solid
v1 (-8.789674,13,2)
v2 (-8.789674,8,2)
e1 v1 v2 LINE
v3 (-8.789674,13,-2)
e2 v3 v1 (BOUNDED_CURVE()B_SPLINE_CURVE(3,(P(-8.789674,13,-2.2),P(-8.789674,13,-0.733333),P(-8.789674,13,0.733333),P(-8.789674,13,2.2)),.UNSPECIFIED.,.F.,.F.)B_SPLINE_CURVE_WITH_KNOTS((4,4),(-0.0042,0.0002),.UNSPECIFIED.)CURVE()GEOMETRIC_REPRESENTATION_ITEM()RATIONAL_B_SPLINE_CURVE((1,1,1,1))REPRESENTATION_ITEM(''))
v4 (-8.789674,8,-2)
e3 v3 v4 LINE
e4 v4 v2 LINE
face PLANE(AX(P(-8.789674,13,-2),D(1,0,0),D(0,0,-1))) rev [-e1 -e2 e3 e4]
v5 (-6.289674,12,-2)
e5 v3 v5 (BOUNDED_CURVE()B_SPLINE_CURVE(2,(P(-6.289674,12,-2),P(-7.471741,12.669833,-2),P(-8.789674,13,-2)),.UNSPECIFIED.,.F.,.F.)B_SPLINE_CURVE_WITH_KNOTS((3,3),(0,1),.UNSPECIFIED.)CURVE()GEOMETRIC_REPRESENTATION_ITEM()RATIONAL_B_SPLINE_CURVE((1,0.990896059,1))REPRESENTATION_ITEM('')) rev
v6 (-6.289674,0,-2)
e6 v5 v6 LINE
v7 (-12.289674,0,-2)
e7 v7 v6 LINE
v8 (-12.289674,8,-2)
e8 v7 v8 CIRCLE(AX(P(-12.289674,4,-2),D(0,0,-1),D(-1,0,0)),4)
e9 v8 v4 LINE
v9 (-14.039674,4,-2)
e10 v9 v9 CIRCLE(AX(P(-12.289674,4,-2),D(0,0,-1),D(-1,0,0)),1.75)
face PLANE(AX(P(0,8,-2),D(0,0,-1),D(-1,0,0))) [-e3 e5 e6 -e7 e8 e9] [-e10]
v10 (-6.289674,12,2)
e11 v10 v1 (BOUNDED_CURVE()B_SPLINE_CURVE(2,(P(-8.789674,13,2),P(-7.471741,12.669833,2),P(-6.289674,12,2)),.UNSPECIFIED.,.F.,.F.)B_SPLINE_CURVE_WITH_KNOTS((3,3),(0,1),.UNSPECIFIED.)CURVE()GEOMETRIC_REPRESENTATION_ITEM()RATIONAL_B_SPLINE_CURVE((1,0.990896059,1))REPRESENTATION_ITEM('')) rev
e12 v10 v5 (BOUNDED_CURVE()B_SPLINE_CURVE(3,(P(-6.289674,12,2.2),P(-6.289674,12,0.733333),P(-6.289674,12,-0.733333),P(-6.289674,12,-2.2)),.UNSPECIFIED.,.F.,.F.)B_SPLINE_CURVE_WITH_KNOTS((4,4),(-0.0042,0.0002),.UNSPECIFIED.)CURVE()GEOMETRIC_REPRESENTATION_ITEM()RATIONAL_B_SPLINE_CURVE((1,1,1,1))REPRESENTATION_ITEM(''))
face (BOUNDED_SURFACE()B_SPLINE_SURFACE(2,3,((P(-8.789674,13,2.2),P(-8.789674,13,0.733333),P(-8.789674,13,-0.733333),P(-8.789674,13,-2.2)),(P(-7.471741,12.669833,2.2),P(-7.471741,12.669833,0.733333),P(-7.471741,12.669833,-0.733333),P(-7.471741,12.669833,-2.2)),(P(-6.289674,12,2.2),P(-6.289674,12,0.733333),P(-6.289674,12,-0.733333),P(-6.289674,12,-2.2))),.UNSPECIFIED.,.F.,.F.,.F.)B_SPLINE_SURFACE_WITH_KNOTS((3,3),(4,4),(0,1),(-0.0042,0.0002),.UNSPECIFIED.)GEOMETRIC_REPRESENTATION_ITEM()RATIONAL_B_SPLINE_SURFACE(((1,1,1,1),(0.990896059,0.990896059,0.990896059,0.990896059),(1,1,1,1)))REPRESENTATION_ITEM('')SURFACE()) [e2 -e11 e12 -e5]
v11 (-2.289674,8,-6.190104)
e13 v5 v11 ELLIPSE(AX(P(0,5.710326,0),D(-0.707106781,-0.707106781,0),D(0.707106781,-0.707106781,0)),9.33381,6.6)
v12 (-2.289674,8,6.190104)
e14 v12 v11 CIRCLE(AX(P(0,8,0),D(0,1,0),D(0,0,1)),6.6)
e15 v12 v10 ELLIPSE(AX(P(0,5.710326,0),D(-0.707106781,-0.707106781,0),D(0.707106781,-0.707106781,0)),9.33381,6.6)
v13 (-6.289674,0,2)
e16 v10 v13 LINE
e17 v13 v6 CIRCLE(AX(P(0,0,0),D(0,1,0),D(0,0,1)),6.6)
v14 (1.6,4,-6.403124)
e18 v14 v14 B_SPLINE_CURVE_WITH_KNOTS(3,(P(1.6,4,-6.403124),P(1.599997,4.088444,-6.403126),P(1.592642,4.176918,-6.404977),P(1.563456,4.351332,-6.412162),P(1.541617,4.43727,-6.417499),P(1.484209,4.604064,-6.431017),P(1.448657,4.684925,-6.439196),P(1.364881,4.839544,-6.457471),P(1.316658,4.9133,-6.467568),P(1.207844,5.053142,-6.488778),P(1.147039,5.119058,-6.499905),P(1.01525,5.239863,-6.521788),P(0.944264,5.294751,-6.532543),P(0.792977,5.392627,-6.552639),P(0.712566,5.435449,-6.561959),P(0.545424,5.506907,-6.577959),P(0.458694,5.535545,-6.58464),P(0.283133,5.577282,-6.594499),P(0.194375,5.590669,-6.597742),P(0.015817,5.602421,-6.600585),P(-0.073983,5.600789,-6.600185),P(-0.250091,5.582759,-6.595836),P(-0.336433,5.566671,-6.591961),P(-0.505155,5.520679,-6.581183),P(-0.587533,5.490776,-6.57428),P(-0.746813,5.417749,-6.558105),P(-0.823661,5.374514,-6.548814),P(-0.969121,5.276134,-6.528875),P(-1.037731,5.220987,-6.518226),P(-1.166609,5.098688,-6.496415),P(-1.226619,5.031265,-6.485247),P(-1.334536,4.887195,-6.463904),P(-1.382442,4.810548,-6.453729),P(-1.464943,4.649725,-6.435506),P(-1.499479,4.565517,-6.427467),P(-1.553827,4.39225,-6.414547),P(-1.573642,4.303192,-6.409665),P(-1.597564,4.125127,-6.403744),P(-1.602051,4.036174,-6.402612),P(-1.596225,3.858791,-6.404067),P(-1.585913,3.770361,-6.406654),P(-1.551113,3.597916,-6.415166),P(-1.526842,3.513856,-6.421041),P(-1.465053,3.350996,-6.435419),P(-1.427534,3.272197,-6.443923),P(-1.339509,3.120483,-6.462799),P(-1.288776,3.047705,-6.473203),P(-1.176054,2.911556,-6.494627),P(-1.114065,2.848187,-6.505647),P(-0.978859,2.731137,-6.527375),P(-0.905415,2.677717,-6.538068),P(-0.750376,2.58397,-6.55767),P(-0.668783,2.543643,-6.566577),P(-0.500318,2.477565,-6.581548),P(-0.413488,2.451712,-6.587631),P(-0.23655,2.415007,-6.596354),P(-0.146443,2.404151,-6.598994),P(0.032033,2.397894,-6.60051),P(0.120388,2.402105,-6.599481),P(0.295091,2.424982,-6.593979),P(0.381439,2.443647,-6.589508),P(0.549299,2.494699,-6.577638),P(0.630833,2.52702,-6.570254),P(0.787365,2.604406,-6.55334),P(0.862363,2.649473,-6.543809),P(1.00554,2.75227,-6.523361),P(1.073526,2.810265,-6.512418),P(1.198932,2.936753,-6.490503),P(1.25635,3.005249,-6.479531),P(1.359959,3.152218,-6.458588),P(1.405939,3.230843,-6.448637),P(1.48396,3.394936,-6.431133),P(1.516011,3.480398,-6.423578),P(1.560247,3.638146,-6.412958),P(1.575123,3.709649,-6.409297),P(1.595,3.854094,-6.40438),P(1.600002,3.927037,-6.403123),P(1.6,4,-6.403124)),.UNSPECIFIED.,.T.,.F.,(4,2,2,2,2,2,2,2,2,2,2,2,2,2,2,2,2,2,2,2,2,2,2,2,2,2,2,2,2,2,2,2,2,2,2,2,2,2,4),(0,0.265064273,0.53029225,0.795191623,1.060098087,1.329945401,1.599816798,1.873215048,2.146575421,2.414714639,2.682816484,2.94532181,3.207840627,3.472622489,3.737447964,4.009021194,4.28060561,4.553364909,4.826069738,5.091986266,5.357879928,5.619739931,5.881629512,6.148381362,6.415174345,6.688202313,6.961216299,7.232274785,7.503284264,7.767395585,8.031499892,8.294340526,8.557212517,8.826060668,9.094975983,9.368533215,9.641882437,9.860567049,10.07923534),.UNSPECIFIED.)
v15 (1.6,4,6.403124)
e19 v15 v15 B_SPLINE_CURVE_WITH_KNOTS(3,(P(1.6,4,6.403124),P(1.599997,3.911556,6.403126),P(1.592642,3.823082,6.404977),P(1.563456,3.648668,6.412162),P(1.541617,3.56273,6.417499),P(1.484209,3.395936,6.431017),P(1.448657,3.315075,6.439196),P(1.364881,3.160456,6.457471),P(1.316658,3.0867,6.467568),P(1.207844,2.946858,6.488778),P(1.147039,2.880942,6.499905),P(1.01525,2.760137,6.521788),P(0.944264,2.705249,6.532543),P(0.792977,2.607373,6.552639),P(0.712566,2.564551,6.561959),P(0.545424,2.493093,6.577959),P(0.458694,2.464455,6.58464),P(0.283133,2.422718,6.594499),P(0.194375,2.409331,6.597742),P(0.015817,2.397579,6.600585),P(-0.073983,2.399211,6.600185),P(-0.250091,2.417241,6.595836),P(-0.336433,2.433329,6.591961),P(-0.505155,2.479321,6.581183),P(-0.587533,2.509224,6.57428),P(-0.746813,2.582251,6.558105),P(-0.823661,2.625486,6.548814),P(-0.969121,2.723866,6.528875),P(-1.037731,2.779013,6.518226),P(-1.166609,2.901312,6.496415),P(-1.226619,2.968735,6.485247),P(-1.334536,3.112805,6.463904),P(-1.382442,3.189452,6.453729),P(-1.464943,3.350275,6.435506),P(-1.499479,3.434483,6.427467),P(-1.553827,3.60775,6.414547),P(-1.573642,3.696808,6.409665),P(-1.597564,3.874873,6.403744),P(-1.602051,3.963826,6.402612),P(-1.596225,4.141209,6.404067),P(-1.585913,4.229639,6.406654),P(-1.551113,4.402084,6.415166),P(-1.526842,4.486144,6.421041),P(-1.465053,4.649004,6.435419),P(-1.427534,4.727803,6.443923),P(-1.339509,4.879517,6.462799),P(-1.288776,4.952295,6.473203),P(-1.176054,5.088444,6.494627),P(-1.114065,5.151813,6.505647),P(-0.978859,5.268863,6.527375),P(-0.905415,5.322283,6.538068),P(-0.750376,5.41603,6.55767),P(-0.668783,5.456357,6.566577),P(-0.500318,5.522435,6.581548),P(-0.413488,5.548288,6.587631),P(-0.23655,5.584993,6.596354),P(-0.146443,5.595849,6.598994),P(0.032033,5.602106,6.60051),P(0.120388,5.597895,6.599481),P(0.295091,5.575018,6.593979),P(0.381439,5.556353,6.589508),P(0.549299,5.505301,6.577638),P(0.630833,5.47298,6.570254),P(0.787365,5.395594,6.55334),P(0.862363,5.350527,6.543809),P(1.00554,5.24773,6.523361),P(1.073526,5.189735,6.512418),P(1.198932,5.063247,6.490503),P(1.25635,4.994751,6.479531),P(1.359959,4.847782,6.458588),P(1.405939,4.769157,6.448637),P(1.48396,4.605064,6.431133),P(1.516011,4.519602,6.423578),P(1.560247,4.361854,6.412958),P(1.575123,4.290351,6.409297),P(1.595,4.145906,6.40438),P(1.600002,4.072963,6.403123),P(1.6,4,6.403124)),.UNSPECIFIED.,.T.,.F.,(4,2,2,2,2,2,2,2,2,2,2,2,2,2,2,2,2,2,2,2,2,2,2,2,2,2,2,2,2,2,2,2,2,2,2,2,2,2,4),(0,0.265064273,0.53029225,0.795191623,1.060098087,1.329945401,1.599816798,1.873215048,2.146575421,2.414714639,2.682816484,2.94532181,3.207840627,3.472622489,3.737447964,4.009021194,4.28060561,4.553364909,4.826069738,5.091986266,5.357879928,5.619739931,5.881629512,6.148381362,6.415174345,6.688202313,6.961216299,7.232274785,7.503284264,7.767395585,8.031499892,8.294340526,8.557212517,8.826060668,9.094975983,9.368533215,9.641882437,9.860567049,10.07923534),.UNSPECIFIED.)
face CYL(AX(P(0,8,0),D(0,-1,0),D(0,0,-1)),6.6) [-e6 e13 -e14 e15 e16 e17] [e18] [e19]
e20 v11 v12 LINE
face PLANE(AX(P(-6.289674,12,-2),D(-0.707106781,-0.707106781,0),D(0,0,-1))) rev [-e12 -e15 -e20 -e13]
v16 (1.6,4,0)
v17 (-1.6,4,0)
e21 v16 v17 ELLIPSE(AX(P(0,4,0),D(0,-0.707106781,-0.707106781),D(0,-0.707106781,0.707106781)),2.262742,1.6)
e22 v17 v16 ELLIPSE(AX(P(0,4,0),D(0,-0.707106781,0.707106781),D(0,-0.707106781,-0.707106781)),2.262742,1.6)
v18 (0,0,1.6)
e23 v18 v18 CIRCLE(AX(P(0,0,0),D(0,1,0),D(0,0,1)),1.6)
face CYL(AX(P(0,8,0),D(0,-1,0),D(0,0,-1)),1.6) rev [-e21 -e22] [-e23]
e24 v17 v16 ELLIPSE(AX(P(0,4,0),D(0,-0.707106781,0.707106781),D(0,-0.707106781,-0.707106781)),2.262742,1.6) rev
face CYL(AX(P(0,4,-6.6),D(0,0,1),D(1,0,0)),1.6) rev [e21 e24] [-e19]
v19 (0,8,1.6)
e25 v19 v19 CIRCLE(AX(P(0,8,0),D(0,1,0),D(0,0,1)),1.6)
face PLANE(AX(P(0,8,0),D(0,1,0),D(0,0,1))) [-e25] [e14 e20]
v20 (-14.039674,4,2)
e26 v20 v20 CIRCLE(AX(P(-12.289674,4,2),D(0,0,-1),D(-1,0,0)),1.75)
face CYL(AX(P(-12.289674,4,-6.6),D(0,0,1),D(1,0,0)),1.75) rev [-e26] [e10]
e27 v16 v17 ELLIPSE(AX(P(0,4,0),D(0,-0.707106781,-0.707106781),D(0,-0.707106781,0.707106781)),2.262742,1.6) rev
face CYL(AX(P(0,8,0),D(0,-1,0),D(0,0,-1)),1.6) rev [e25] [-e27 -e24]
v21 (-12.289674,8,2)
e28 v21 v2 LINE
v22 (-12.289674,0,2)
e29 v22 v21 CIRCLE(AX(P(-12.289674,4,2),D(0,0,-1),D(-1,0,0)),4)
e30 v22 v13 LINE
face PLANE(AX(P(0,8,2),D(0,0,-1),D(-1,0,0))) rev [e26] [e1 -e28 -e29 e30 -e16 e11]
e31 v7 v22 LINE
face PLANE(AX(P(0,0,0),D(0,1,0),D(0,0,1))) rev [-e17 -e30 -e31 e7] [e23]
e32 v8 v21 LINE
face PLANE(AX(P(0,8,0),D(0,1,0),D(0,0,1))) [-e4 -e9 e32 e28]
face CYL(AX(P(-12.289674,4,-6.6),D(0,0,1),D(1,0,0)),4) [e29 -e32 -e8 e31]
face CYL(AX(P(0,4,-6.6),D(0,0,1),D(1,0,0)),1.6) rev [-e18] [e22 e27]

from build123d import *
from build123d.topology import SkipClean

# Parameters (mm, degrees)
SKETCH1_R               = 1.6
BOSS_EXTRUDE1_DEPTH     = 8
CUT_EXTRUDE1_DEPTH      = 21.082666196
CUT_EXTRUDE1_DEPTH_BACK = 21.082666196
SKETCH2_R               = 1.75
SKETCH2_R_2             = 1.6
SKETCH4_W               = 2.5
SKETCH4_H               = 4
BOSS_EXTRUDE3_DEPTH     = 5
CHAMFER1_START          = 8
CHAMFER1_DEPTH          = 4
CHAMFER1_START_2        = -8
CHAMFER1_2_DEPTH        = 16
FILLET2_R               = 10


with BuildPart() as part:
    # Sketch1 → Boss-Extrude1 (new body)
    with BuildSketch(Plane(origin=(0, 0, 0), x_dir=(1, 0, 0), z_dir=(0, 1, 0))):
        with BuildLine():
            Line((-6.289674077, 2), (-16.289674077, 2))
            Line((-16.289674077, 2), (-16.289674077, -2))
            Line((-16.289674077, -2), (-6.289674077, -2))
            ThreePointArc((-6.289674077, -2), (0, -6.6), (6.289674077, -2))
            ThreePointArc((6.289674077, -2), (6.6, 0), (6.289674077, 2))
            ThreePointArc((6.289674077, 2), (0, 6.6), (-6.289674077, 2))
        make_face()
        with Locations(Location((0, 0, 0), (0, 0, 270))):
            Circle(SKETCH1_R, mode=Mode.SUBTRACT)
    extrude(amount=BOSS_EXTRUDE1_DEPTH)

    # Sketch2 → Cut-Extrude1 (cut, two sides: drawn at the far end of the back side and taken through both)
    with BuildSketch(Plane.XY.offset(2).offset(-CUT_EXTRUDE1_DEPTH_BACK)):
        with BuildLine():
            Line((-16.289674077, 8), (-16.289674077, 4))
            ThreePointArc((-16.289674077, 4), (-15.118101202, 6.828427125), (-12.289674077, 8))
            Line((-12.289674077, 8), (-16.289674077, 8))
        make_face()
        with BuildLine():
            Line((-16.289674077, 4), (-16.289674077, 0))
            Line((-16.289674077, 0), (-12.289674077, 0))
            ThreePointArc((-12.289674077, 0), (-15.118101202, 1.171572875), (-16.289674077, 4))
        make_face()
        with Locations(Location((-12.289674077, 4, 0), (0, 0, 180))):
            Circle(SKETCH2_R)
        with Locations((0, 4)):
            Circle(SKETCH2_R_2)
    extrude(amount=CUT_EXTRUDE1_DEPTH + CUT_EXTRUDE1_DEPTH_BACK, mode=Mode.SUBTRACT)

    # Sketch4 → Boss-Extrude3 (add)
    with BuildSketch(Plane(origin=(0, 8, 0), x_dir=(1, 0, 0), z_dir=(0, 1, 0))):
        with Locations((-7.539674077, 0)):
            Rectangle(SKETCH4_W, SKETCH4_H)
    extrude(amount=BOSS_EXTRUDE3_DEPTH)

    # Chamfer1: read off the stored shape, not the designer's step
    # Chamfer1 outline → Chamfer1 (add)
    with SkipClean():  # the faces are left unmerged after this step: merging them gives an invalid solid
        with BuildSketch(Plane(origin=(0, 0, 0), x_dir=(1, 0, 0), z_dir=(0, 1, 0)).offset(CHAMFER1_START)):
            with BuildLine():
                ThreePointArc((-6.289674077, -2), (6.6, 0), (-6.289674077, 2))
                Line((-6.289674077, 2), (-6.289674077, -2))
            make_face()
        extrude(amount=CHAMFER1_DEPTH)

    # Chamfer1 2 outline → Chamfer1 2 (cut)
    with BuildSketch(Plane.XY.offset(CHAMFER1_START_2)):
        Polygon((-2.289674077, 8), (8, 8), (8, 12), (-6.289674077, 12), align=None)
    extrude(amount=CHAMFER1_2_DEPTH, mode=Mode.SUBTRACT)

    # Fillet2
    # the kernel refuses this fillet: 10 mm, written as the material it takes off along each edge
    with BuildSketch(Plane(origin=(-6.289674077, 13, -8.25), x_dir=(4.06555678011955e-10, -1.0, 0), z_dir=(0, 0, 1))) as fillet2_piece_1:
        with BuildLine():
            CenterArc((9.700238938, -4.930095579), FILLET2_R, 150.461416233, 15.474348521)
            Line((-1e-09, -2.5), (0, 0))
            Line((0, 0), (1, 0))
        make_face()
    extrude(amount=16.5, mode=Mode.SUBTRACT)


solid = part.part
